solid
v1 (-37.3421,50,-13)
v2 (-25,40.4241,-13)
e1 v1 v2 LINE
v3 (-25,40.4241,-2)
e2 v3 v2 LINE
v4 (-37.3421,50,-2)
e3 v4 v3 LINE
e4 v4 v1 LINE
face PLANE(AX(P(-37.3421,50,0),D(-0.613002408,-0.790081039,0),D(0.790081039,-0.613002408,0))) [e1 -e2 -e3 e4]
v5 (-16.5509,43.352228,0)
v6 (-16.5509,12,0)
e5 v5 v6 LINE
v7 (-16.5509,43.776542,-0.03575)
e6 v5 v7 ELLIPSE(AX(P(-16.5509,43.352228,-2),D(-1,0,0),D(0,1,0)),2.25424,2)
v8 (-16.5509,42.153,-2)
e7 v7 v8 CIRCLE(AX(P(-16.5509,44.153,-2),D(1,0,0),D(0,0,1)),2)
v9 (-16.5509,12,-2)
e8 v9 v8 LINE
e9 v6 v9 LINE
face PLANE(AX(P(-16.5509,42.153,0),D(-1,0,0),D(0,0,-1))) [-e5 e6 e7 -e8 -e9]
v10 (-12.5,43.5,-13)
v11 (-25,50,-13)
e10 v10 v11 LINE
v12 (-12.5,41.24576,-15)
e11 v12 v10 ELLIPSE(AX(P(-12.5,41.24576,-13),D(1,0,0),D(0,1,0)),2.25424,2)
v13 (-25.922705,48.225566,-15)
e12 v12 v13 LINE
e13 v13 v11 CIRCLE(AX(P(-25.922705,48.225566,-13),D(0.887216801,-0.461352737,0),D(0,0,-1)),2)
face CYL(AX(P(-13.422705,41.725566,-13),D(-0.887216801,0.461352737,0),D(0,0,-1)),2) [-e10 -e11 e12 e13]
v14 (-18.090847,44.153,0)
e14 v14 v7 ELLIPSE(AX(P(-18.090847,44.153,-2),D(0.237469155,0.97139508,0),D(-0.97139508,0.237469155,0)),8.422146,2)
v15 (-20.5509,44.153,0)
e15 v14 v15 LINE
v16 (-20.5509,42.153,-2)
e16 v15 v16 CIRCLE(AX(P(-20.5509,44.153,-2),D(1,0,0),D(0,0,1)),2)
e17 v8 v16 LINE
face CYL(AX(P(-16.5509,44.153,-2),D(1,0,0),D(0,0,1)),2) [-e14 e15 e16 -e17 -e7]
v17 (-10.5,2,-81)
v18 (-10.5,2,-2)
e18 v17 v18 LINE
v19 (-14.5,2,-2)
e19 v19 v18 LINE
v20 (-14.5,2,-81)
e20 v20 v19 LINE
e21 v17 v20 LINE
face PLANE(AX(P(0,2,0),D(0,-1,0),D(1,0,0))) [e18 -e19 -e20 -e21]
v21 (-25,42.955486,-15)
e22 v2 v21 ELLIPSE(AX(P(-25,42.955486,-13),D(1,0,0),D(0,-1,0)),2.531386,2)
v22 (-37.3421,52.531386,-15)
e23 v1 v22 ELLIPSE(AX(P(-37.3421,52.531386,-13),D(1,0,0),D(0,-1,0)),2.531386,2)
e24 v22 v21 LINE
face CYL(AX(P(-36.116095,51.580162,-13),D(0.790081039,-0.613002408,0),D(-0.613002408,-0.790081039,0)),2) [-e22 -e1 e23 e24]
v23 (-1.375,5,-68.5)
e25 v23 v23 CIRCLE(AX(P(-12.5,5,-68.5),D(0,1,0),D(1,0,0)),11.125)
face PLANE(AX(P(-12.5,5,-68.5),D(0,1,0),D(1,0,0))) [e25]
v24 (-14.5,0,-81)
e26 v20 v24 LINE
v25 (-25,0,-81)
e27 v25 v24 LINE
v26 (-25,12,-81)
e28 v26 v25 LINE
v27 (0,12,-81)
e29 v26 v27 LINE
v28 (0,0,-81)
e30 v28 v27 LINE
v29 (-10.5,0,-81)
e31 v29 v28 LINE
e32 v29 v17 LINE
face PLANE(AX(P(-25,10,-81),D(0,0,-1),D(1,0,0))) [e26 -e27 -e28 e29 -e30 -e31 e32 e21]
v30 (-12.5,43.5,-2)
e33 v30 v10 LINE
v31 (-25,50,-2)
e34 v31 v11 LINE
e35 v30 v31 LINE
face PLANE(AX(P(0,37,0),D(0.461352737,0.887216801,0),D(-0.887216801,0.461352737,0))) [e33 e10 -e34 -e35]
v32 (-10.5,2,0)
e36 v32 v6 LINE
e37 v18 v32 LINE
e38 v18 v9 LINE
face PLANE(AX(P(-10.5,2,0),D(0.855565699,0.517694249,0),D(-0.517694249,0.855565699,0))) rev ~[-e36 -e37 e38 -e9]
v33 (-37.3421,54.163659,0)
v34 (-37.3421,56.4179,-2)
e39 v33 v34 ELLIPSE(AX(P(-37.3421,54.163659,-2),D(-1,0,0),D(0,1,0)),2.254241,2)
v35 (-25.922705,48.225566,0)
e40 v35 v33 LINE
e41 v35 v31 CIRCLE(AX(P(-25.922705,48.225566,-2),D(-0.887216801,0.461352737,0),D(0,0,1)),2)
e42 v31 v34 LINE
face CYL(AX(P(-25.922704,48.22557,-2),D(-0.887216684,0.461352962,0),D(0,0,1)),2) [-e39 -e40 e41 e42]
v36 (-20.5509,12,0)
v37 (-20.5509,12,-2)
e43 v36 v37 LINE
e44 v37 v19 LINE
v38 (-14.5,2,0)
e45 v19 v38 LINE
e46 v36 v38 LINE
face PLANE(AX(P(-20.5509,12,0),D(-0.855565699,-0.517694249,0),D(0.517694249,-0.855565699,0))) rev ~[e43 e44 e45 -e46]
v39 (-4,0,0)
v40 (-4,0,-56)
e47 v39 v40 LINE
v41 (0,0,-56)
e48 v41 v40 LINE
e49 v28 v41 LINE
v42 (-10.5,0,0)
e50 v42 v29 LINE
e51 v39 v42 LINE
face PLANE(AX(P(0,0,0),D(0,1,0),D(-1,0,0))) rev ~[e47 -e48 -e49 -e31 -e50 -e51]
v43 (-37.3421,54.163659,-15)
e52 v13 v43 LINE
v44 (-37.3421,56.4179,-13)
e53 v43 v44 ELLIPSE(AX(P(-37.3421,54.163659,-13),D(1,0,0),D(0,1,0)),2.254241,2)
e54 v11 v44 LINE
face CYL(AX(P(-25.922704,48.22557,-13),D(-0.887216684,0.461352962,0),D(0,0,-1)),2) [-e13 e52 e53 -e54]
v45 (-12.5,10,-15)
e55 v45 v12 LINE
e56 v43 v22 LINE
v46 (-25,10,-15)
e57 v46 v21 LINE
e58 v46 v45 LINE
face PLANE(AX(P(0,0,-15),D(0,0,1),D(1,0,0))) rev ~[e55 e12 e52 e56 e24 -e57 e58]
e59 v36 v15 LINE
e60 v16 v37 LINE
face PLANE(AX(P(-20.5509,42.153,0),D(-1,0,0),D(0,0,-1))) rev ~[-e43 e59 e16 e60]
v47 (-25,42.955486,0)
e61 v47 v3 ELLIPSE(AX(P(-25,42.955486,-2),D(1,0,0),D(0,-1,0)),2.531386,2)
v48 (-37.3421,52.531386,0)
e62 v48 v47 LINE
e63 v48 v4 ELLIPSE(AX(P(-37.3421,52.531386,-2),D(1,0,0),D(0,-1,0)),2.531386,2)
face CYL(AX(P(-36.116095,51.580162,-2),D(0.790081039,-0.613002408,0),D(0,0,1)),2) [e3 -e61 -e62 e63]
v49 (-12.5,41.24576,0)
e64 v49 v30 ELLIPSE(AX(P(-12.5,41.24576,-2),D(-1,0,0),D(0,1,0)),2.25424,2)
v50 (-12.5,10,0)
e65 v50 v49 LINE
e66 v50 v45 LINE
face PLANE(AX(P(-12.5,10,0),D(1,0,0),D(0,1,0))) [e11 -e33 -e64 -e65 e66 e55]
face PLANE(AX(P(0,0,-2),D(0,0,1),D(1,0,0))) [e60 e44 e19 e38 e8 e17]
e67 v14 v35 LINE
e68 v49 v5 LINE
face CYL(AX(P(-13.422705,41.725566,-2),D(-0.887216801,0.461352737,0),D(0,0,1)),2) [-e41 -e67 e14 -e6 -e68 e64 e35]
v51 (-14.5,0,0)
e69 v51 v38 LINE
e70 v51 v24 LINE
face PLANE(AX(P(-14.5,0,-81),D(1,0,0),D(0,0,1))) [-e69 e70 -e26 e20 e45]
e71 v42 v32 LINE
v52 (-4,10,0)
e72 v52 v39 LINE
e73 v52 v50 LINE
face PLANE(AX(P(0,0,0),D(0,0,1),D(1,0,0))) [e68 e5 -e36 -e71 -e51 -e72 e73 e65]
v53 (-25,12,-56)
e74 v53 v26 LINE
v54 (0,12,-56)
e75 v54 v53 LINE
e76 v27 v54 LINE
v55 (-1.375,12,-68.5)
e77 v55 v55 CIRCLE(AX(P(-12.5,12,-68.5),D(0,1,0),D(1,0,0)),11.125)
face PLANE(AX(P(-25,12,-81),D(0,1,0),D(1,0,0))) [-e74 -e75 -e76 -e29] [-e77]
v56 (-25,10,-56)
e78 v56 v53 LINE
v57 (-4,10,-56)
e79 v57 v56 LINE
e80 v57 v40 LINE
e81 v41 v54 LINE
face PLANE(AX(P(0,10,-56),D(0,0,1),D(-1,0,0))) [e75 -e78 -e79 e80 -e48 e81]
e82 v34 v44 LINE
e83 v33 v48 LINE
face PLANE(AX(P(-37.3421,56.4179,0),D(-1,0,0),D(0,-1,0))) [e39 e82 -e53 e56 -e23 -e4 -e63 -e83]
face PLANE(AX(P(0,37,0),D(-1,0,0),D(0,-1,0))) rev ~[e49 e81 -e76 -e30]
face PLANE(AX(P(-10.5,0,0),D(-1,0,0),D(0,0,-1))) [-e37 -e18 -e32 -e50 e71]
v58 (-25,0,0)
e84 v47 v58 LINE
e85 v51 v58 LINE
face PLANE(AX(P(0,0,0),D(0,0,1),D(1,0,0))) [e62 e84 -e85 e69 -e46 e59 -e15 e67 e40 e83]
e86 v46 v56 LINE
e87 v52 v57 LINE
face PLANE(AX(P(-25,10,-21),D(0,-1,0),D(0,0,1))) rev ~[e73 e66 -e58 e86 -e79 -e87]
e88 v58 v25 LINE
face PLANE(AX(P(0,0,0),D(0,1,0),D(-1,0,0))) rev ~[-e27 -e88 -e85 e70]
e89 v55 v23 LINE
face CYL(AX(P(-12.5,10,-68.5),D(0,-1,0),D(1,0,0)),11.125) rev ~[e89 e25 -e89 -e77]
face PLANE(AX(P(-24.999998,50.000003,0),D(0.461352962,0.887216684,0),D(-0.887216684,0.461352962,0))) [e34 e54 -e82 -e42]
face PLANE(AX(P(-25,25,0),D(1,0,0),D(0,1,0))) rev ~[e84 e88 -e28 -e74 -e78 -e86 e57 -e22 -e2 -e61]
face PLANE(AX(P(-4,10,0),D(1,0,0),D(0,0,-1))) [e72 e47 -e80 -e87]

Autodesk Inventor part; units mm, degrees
ref_plane "YZ Plane" through (0, 0, 0) normal (1, 0, 0) x (0, 1, 0)
ref_plane "XZ Plane" through (0, 0, 0) normal (0, 1, 0) x (-1, 0, 0)
ref_plane "XY Plane" through (0, 0, 0) normal (0, 0, 1) x (1, 0, 0)
sketch "Sketch1" plane through (0, 0, 0) normal (0, 1, 0) x (-1, 0, 0)
  line L0 (0, 0) -> (25, 0)
  line L1 (25, 0) -> (25, -81)
  line L2 (25, -81) -> (0, -81)
  line L3 (0, -81) -> (0, 0)
  dimension "d0" = 25
  dimension "d1" = 81
extrude "Extrusion1" add sketch "Sketch1" along normal blind 25
sketch "Sketch2" plane through (0, 0, 0) normal (1, 0, 0) x (0, 0, -1)
  line L0 (81, 0) -> (81, 10)
  line L1 (81, 0) -> (81, 25) projected
  line L2 (81, 25) -> (21, 25)
  line L3 (21, 25) -> (21, 10)
  line L4 (21, 10) -> (81, 10)
  line L5 (81, 10) -> (81, 25)
  point P0 (0, 0)
  dimension "d4" = 10
  dimension "d5" = 60
extrude "Extrusion2" cut sketch "Sketch2" against normal through all
sketch "Sketch3" plane through (0, 10, -21) normal (0, 1, 0) x (1, 0, 0)
  line L0 (0, 60) -> (0, -21) projected
  line L1 (-25, 60) -> (0, 60)
  line L2 (0, 60) -> (0, 35)
  line L3 (0, 35) -> (-25, 35)
  line L4 (-25, 35) -> (-25, 60)
  circle A0 centre (-12.5, 47.5) radius 11.125
  dimension "d8" = 25
  dimension "d9" = 22.25
extrude "Extrusion3" cut sketch "Sketch3" against normal blind 7 contours A0
sketch "Sketch4" plane through (-25, 0, 0) normal (0, 0, 1) x (1, 0, 0)
  line L0 (25, 10) -> (0, 25)
  line L1 (0, 25) -> (25, 25)
  line L2 (0, 25) -> (25, 25) projected
  line L3 (25, 25) -> (25, 10)
  point P0 (25, 0)
extrude "Extrusion4" cut sketch "Sketch4" against normal blind 21
sketch "Sketch5" plane through (0, 0, 0) normal (0, -1, 0) x (1, 0, 0)
  line L0 (0, 0) -> (-25, 0) projected
  line L1 (-10.5, -162) -> (-14.5, -162)
  line L2 (-14.5, -162) -> (-14.5, 0)
  line L3 (-14.5, 0) -> (-10.5, 0)
  line L4 (-10.5, 0) -> (-10.5, -162)
  line L5 (-25, -81) -> (0, -81) projected
  line L6 (-10.5, -162) -> (-14.5, 0) construction
  line L7 (-14.5, -162) -> (-10.5, 0) construction
  point P0 (-12.5, -81)
  dimension "d14" = 4
extrude "Extrusion5" cut sketch "Sketch5" against normal blind 2
sketch "Sketch6" plane through (-25, 10, -81) normal (0, 1, 0) x (1, 0, 0)
  line L0 (25, -25) -> (0, -25)
  line L1 (0, -25) -> (0, 0)
  line L2 (0, 0) -> (25, 0)
  line L3 (25, 0) -> (25, -25)
  circle A0 centre (12.5, -12.5) radius 11.125 projected
  line L4 (25, -25) -> (0, 0) construction
  line L5 (0, -25) -> (25, 0) construction
  circle A1 centre (12.5, -12.5) radius 11.125
  point P0 (25, -81)
extrude "Extrusion6" add sketch "Sketch6" along normal blind 2
sketch "Sketch7" plane through (-12.5, 3, -68.5) normal (0, 1, 0) x (1, 0, 0)
  circle A0 centre (0, 0) radius 11.125 projected
  circle A1 centre (0, 0) radius 11.125
  point P0 (12.5, -68.5)
extrude "Extrusion7" add sketch "Sketch7" along normal blind 2
sketch "Sketch8" plane through (-25, 0, 0) normal (0, 0, 1) x (1, 0, 0)
  line L0 (0, 0) -> (0, 50)
  line L1 (0, 50) -> (25, 50)
  line L2 (25, 50) -> (25, 37)
  line L3 (25, 37) -> (0, 50)
  line L4 (25, 37) -> (25, 10)
  line L5 (25, 0) -> (25, 12) projected
  line L6 (25, 10) -> (0, 25)
  line L7 (25, 10) -> (0, 25) projected
  line L8 (0, 50) -> (0, 25)
  line L9 (25, 10) -> (0, 25)
  line L10 (25, 37) -> (25, 10)
  line L11 (25, 10) -> (0, 10) projected
  line L12 (25, 37) -> (0, 50)
  dimension "d21" = 50
  dimension "d22" = 13
extrude "Extrusion8" add sketch "Sketch8" against normal blind 15 contours L0 L3 L4 L6
sketch "Sketch9" plane through (-25, 0, -81) normal (-1, 0, 0) x (0, 0, 1)
  line L0 (66, 25) -> (60, 25)
  line L1 (60, 25) -> (60, 10)
  line L2 (60, 10) -> (66, 10)
  line L3 (66, 10) -> (66, 25)
  point P0 (81, 0)
extrude "Extrusion9" cut sketch "Sketch9" against normal through all
sketch "Sketch10" plane through (-25, 0, -15) normal (0, 0, -1) x (-1, 0, 0)
  point P0 (-25, 0)
sketch "Sketch11" plane through (-10.5, 0, 0) normal (0, 0, 1) x (1, 0, 0)
  line L0 (10.5, 10) -> (-2, 10)
  line L1 (-2, 10) -> (-2, 47.9639)
  line L2 (-2, 47.9639) -> (10.5, 47.9639)
  line L3 (10.5, 47.9639) -> (10.5, 10)
  point P0 (10.5, 0)
extrude "Extrusion10" cut sketch "Sketch11" against normal blind 15
sketch "Sketch12" plane through (0, 0, 0) normal (0, 0, 1) x (1, 0, 0)
  line L0 (-12.5, 43.5) -> (-37.3421, 56.4179)
  line L1 (-25, 50) -> (-12.5, 43.5) projected
  line L2 (-37.3421, 56.4179) -> (-37.3421, 50)
  line L3 (-37.3421, 50) -> (-25, 40.4241)
  line L4 (-25, 0) -> (-25, 50) projected
  line L5 (-12.5, 43.5) -> (-25, 40.4241)
  point P0 (0, 0)
  dimension "d29" = 28
extrude "Extrusion11" add sketch "Sketch12" against normal blind 15 contours L4 L3 L2 L0
fillet "Fillet1" radius 2 1 edges at (-24.921, 49.9589, 0)
fillet "Fillet2" radius 2 1 edges at (-31.171, 45.212, 0)
fillet "Fillet3" radius 2 2 edges at (-24.921, 49.9589, -15) (-31.171, 45.212, -15)
sketch "Sketch13" plane through (0, 0, 0) normal (0, 0, 1) x (1, 0, 0)
  line L0 (-10.5, 2) -> (-16.5509, 12)
  line L1 (-23.625, 12) -> (-1.375, 12) projected
  line L2 (-16.5509, 12) -> (-16.5509, 42.153)
  line L3 (-16.5509, 42.153) -> (-20.5509, 42.153)
  line L4 (-20.5509, 42.153) -> (-20.5509, 12)
  line L5 (-20.5509, 12) -> (-14.5, 2)
  line L6 (-14.5, 2) -> (-10.5, 2)
  line L7 (-14.5, 2) -> (-10.5, 2) projected
  point P0 (0, 0)
  dimension "d35" = 4
extrude "Extrusion12" cut sketch "Sketch13" against normal blind 2
fillet "Fillet4" radius 2 1 edges at (-18.5509, 42.153, 0)
sketch "Sketch14" plane through (0, 10, 0) normal (0, 1, 0) x (1, 0, 0)
  line L0 (0, 56) -> (-25, 56) projected
  line L1 (0, 0) -> (-4, 0)
  line L2 (-4, 0) -> (-4, 56)
  line L3 (-4, 56) -> (0, 56)
  line L4 (0, 56) -> (0, 0)
  dimension "d39" = 4
extrude "Extrusion13" cut sketch "Sketch14" against normal through all
sketch "Sketch15" plane through (-25, 0, -15) normal (0, 0, -1) x (-1, 0, 0)
  point P0 (-25, 0)
properties part number "ConductiveThread"
